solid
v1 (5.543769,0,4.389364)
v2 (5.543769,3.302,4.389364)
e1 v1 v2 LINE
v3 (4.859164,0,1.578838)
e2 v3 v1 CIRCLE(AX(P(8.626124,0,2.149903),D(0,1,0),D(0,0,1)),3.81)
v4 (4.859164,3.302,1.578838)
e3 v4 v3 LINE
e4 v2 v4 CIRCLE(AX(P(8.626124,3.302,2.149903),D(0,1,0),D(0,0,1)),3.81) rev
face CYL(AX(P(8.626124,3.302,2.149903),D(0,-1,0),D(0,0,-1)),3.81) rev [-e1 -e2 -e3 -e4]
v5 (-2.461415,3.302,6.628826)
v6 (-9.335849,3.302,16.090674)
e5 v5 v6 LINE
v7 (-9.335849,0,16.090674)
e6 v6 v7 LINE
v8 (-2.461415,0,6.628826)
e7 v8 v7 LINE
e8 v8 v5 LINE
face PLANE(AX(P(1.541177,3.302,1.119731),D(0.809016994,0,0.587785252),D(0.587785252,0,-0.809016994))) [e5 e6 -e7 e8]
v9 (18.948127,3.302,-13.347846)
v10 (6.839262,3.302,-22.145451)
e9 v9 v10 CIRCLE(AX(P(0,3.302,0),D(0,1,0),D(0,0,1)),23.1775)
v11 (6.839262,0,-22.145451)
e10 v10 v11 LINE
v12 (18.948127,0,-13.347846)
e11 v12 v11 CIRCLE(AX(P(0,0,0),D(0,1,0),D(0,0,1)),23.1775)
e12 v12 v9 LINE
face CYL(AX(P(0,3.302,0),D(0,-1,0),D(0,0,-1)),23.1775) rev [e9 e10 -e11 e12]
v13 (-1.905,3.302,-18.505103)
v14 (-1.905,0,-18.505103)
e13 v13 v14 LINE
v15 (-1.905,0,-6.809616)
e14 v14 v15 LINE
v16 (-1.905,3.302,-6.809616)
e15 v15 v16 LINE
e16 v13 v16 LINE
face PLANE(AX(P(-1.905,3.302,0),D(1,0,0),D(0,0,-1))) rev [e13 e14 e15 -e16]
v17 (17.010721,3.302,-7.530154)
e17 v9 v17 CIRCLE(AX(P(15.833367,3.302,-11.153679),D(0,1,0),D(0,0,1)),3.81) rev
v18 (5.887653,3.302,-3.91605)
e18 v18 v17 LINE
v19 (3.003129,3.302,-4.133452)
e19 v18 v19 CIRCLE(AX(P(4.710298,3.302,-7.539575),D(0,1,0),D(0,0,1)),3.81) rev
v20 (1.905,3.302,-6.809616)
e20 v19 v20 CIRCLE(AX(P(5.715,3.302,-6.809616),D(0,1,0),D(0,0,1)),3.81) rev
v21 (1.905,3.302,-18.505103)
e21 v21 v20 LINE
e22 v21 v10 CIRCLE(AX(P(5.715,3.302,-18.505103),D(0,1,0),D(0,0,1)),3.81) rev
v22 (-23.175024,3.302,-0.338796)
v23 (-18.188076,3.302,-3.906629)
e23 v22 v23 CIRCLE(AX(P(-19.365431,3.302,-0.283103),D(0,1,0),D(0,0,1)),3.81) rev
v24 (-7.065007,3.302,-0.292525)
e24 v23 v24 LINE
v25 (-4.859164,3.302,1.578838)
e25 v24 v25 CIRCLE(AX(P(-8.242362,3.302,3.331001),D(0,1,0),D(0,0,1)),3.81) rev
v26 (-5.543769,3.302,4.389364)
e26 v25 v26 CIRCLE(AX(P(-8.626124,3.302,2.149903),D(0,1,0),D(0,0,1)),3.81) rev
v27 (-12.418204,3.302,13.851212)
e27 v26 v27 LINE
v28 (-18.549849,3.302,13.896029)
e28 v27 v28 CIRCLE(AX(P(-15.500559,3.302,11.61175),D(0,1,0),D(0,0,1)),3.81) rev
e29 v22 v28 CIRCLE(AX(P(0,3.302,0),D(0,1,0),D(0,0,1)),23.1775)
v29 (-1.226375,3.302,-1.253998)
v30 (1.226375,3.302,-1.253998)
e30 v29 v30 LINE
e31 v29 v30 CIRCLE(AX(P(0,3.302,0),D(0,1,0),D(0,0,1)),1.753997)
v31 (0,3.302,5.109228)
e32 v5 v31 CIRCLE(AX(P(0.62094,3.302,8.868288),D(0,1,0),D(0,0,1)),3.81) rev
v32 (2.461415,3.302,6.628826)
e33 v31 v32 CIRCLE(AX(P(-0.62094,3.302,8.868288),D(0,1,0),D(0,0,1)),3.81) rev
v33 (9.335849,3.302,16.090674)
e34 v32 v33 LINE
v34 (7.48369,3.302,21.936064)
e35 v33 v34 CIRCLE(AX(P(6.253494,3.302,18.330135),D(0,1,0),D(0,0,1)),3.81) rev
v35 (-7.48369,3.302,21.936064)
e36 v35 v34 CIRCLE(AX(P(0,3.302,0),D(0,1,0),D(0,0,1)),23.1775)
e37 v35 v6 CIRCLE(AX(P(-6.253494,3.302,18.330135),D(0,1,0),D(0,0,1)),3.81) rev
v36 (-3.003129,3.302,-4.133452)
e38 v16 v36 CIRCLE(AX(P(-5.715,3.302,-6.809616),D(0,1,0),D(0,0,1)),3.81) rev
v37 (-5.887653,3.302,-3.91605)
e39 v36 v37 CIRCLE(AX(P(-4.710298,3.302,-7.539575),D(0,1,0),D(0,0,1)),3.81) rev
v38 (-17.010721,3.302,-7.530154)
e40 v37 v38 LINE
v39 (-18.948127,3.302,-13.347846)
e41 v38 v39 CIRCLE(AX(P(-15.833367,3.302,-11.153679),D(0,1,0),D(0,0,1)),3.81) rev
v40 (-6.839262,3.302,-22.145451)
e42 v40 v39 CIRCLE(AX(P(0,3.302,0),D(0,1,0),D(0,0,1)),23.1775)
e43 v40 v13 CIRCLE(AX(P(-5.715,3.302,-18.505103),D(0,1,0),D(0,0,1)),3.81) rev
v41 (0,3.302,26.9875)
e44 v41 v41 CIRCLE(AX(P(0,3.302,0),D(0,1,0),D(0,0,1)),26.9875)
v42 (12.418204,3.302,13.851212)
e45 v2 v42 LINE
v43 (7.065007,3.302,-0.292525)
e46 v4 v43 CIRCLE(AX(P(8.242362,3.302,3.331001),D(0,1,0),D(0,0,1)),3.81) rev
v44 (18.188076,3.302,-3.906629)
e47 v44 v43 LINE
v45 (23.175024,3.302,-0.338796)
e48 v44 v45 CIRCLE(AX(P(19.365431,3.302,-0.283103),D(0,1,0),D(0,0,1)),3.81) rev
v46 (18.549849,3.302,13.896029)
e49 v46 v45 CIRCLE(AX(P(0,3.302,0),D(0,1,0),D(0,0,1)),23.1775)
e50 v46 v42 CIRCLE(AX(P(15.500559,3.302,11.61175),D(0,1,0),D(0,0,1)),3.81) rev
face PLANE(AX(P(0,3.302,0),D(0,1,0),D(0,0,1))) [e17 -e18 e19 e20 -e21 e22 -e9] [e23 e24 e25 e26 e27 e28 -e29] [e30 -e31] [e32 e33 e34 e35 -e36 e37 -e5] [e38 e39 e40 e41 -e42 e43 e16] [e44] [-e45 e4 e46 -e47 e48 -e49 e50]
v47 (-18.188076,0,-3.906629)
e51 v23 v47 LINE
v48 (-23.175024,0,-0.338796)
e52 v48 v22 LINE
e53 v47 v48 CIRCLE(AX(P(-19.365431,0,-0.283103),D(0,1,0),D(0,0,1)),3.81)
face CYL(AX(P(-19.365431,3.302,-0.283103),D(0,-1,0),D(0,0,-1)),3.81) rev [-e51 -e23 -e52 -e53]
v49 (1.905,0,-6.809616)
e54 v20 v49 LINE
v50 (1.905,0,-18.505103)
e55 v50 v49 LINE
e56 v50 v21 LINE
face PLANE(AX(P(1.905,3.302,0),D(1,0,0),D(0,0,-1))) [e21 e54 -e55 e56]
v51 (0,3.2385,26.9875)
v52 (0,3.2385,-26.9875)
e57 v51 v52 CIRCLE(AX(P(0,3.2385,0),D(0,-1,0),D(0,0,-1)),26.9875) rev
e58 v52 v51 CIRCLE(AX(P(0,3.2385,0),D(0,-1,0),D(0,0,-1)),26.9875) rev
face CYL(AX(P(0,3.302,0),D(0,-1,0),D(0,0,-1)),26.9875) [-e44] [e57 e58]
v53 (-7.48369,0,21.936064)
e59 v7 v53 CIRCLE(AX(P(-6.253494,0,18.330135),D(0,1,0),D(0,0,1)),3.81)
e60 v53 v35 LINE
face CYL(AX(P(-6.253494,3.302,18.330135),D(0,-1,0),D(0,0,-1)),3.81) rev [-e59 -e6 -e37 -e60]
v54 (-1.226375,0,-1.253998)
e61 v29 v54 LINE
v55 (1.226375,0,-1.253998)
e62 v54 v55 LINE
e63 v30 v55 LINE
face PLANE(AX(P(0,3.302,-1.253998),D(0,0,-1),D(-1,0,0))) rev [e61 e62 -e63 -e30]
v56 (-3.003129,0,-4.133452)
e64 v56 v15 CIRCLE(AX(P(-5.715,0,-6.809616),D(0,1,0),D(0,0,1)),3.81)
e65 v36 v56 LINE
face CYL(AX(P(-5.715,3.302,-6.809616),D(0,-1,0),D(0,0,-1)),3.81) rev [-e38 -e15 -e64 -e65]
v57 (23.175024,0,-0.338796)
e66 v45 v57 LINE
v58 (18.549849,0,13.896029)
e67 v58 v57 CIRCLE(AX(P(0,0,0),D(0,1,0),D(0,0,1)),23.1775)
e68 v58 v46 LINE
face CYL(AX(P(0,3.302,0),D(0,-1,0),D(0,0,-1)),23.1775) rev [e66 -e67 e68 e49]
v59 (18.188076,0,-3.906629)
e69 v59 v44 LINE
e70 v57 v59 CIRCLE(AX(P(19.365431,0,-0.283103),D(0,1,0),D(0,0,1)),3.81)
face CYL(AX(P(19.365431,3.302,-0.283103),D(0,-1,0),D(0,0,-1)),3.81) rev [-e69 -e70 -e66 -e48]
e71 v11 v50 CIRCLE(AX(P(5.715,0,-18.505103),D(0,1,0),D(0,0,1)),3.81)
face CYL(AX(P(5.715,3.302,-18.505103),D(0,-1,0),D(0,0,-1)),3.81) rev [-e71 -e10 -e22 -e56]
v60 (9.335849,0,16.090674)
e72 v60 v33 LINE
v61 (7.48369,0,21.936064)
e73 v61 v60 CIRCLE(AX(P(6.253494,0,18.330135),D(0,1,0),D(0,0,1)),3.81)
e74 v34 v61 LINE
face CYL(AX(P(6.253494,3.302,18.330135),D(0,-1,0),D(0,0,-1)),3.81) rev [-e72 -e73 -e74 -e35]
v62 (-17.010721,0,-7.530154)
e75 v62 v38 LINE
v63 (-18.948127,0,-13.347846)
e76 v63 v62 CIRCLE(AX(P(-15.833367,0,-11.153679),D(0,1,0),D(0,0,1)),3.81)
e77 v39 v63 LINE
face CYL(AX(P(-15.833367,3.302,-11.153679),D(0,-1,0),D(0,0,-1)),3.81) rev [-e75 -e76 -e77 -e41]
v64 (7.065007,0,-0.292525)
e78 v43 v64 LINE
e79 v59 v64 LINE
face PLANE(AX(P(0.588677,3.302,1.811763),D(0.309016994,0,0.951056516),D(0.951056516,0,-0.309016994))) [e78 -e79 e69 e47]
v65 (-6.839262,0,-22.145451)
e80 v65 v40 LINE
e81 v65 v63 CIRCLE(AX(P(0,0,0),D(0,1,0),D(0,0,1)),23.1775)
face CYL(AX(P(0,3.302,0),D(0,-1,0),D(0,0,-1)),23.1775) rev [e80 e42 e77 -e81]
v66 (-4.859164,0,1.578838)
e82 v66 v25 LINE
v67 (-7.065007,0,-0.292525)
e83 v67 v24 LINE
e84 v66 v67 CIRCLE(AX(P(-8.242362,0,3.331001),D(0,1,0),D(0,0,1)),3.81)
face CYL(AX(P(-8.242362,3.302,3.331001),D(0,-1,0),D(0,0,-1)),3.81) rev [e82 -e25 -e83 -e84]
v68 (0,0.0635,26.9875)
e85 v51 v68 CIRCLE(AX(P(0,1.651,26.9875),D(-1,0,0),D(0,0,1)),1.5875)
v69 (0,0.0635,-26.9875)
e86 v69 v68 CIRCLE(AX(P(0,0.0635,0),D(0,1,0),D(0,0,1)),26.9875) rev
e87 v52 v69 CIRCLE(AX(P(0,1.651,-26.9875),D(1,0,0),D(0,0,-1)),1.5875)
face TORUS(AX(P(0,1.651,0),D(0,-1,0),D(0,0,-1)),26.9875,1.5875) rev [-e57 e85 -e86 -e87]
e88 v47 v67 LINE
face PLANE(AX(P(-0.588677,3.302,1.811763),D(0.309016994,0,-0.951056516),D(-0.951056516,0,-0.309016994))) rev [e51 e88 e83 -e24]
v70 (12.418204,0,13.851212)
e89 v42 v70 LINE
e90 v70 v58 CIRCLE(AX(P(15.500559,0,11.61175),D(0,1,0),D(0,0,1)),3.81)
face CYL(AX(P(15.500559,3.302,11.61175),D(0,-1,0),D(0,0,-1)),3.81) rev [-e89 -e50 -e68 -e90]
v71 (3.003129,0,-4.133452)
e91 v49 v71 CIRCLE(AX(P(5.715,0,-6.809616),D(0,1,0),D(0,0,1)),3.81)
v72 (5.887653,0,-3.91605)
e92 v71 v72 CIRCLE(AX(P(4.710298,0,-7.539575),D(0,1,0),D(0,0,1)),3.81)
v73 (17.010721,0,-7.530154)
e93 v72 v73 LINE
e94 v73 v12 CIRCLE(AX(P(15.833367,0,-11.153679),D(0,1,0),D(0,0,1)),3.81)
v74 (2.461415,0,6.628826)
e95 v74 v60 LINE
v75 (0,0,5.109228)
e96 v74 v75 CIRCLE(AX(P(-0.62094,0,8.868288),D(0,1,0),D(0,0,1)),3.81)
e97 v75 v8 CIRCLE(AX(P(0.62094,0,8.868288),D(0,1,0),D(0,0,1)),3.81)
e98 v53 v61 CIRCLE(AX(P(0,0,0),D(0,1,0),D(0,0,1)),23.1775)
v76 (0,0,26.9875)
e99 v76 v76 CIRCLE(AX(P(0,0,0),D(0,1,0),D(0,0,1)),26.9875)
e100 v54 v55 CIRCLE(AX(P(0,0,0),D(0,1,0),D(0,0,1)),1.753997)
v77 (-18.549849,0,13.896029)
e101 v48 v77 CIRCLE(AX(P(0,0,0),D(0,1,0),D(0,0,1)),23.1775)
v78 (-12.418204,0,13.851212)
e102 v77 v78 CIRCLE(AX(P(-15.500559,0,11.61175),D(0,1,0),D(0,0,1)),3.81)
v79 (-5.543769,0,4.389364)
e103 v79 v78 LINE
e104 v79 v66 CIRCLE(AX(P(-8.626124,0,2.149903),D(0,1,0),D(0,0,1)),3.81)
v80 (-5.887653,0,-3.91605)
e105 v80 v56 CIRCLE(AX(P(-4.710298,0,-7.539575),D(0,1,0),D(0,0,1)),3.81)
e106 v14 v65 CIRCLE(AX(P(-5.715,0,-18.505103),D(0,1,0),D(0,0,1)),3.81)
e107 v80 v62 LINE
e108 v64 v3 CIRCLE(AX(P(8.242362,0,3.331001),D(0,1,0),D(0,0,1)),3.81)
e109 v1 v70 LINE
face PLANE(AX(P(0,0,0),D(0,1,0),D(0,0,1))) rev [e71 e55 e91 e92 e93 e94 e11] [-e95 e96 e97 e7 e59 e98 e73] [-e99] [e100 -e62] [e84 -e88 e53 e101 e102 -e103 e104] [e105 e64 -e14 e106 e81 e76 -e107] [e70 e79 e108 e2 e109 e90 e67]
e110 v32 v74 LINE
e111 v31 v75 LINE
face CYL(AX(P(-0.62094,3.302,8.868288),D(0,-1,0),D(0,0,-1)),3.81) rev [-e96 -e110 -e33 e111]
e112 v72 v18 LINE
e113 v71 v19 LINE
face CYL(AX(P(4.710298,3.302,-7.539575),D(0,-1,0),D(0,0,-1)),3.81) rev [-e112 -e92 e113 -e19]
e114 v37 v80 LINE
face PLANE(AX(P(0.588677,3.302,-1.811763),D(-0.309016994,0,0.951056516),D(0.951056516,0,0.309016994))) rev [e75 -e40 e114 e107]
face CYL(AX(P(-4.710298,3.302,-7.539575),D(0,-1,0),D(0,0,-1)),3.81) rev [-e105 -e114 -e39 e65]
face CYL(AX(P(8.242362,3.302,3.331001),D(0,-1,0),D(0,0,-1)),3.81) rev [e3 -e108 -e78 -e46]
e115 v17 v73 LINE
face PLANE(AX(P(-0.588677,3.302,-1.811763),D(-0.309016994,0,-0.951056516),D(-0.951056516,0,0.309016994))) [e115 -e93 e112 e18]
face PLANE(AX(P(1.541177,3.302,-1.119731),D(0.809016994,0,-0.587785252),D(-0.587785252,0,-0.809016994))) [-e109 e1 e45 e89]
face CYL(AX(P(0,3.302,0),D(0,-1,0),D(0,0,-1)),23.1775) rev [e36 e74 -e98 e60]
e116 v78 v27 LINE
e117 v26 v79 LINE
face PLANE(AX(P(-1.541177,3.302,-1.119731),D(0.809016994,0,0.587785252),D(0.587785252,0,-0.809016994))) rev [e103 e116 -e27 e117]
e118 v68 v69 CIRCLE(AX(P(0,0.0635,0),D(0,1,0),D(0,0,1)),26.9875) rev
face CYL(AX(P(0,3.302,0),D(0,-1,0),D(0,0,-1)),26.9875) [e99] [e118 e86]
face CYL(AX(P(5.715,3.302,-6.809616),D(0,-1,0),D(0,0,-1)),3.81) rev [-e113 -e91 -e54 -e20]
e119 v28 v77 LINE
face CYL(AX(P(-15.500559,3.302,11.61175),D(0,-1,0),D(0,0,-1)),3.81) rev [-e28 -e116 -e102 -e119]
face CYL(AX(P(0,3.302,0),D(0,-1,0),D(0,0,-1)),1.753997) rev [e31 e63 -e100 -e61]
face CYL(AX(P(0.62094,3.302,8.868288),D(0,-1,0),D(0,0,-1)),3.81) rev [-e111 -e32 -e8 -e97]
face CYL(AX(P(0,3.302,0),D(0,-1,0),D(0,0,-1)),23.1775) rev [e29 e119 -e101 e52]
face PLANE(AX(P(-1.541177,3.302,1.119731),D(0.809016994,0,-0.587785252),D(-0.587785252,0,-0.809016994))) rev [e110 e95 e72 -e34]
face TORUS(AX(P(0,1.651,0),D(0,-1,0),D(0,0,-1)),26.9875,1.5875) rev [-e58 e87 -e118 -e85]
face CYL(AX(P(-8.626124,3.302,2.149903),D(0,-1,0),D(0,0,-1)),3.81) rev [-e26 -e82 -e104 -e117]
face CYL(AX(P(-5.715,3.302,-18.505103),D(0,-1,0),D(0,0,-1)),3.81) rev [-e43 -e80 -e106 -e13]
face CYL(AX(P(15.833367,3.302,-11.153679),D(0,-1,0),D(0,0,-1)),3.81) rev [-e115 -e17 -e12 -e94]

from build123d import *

# Parameters (mm, degrees)
SKETCH1_R           = 26.9875
BOSS_EXTRUDE1_DEPTH = 3.302
FILLET1_R           = 3.81
SKETCH2_R           = 1.5875


with BuildPart() as part:
    # Sketch1 → Boss-Extrude1 (new body)
    with BuildSketch(Plane(origin=(0, 0, 0), x_dir=(1, 0, 0), z_dir=(0, 1, 0))):
        with Locations(Location((0, 0, 0), (0, 0, 90))):
            Circle(SKETCH1_R)
        with BuildLine():
            Line((-1.905, 23.099079662), (-1.905, 4.709286039))
            ThreePointArc((-1.905, 4.709286039), (-2.985949082, 4.109806331), (-3.8901198, 3.267012081))
            Line((-3.8901198, 3.267012081), (-21.379852859, 8.949770834))
            ThreePointArc((-21.379852859, 8.949770834), (-13.623392685, 18.750991387), (-1.905, 23.099079662))
        make_face(mode=Mode.SUBTRACT)
        with BuildLine():
            Line((1.905, 23.099079662), (1.905, 4.709286039))
            ThreePointArc((1.905, 4.709286039), (2.985949082, 4.109806331), (3.8901198, 3.267012081))
            Line((3.8901198, 3.267012081), (21.379852859, 8.949770834))
            ThreePointArc((21.379852859, 8.949770834), (13.623392685, 18.750991387), (1.905, 23.099079662))
        make_face(mode=Mode.SUBTRACT)
        with BuildLine():
            Line((-22.557207608, 5.326245507), (-5.067474549, -0.356513246))
            ThreePointArc((-5.067474549, -0.356513246), (-4.831367103, -1.569806331), (-4.309226257, -2.690161532))
            Line((-4.309226257, -2.690161532), (-15.118475741, -17.567817096))
            ThreePointArc((-15.118475741, -17.567817096), (-22.043112406, -7.162241387), (-22.557207608, 5.326245507))
        make_face(mode=Mode.SUBTRACT)
        with BuildLine():
            Line((-1.226871508, -4.929623343), (-12.036120993, -19.807278907))
            ThreePointArc((-12.036120993, -19.807278907), (0, -23.1775), (12.036120993, -19.807278907))
            Line((12.036120993, -19.807278907), (1.226871508, -4.929623343))
            ThreePointArc((1.226871508, -4.929623343), (0, -5.08), (-1.226871508, -4.929623343))
        make_face(mode=Mode.SUBTRACT)
        with BuildLine():
            Line((22.557207608, 5.326245507), (5.067474549, -0.356513246))
            ThreePointArc((5.067474549, -0.356513246), (4.831367103, -1.569806331), (4.309226257, -2.690161532))
            Line((4.309226257, -2.690161532), (15.118475741, -17.567817096))
            ThreePointArc((15.118475741, -17.567817096), (22.043112406, -7.162241387), (22.557207608, 5.326245507))
        make_face(mode=Mode.SUBTRACT)
        with BuildLine():
            Line((-1.226374532, 1.253998), (1.226374532, 1.253998))
            ThreePointArc((1.226374532, 1.253998), (0, -1.753997), (-1.226374532, 1.253998))
        make_face(mode=Mode.SUBTRACT)
    extrude(amount=BOSS_EXTRUDE1_DEPTH)

    # Fillet1
    # the kernel refuses this fillet: 3.81 mm, written as the material it adds along each edge
    with BuildSketch(Plane(origin=(-22.557207608, 0, -5.326245507), x_dir=(0.9510565162951546, 0, 0.3090169943749439), z_dir=(0, 1, 0)), Plane(origin=(-1.905, 0, -23.099079662), x_dir=(0, 0, 1), z_dir=(0, 1, 0))) as fillet1_piece_1:
        with BuildLine():
            CenterArc((4.593976819, -3.81), FILLET1_R, 90, 107.162452548)
            ThreePointArc((0.953628718, -4.934262295), (0.342682242, -2.493054423), (0, 0))
            Line((0, 0), (4.593976819, 0))
        make_face()
    extrude(amount=3.302)
    with BuildSketch(Plane(origin=(-5.067474549, 0, 0.356513246), x_dir=(-0.9510565162951546, 0, -0.3090169943749442), z_dir=(0, 1, 0)), Plane(origin=(-1.226871508, 0, 4.929623343), x_dir=(-0.5877852522924791, 0, 0.8090169943749429), z_dir=(0, 1, 0)), Plane(origin=(4.309226257, 0, 2.690161532), x_dir=(0.5877852522924685, 0, 0.8090169943749509), z_dir=(0, 1, 0)), Plane(origin=(-1.905, 0, -4.709286039), x_dir=(0, 0, -1), z_dir=(0, 1, 0))) as fillet1_piece_2:
        with BuildLine():
            CenterArc((2.100330323, 3.81), FILLET1_R, 220.005200885, 49.994799115)
            ThreePointArc((-0.818076689, 1.360714286), (-0.355550163, 0.712514837), (0, 0))
            Line((0, 0), (2.100330323, 0))
        make_face()
    extrude(amount=3.302)
    with BuildSketch(Plane(origin=(-4.309226257, 0, 2.690161532), x_dir=(-0.3904940341583853, 0, -0.9206054579931132), z_dir=(0, 1, 0)), Plane(origin=(1.226871508, 0, 4.929623343), x_dir=(-0.9962171125182067, 0, 0.08689916412651309), z_dir=(0, 1, 0)), Plane(origin=(5.067474549, 0, 0.356513246), x_dir=(-0.22520200155214, 0, 0.9743120950172537), z_dir=(0, 1, 0)), Plane(origin=(1.905, 0, -4.709286039), x_dir=(0.8570346212244796, 0, 0.5152588262442601), z_dir=(0, 1, 0)), Plane(origin=(-3.8901198, 0, -3.267012081), x_dir=(0.7548785270042563, 0, -0.6558646273949256), z_dir=(0, 1, 0))) as fillet1_piece_3:
        with BuildLine():
            CenterArc((2.18308817, 3.763191931), FILLET1_R, 211.014756861, 49.994799115)
            Line((-1.082213737, 1.800055803), (0, 0))
            ThreePointArc((0, 0), (0.793850244, 0.062410759), (1.587700487, 0))
        make_face()
    extrude(amount=3.302)
    with BuildSketch(Plane(origin=(-15.118475741, 0, 17.567817096), x_dir=(0.5877852522924796, 0, -0.8090169943749426), z_dir=(0, 1, 0)), Plane(origin=(-21.379852859, 0, -8.949770834), x_dir=(0.9510565162951546, 0, 0.3090169943749444), z_dir=(0, 1, 0)), Plane(origin=(1.905, 0, -23.099079662), x_dir=(0, 0, 1), z_dir=(0, 1, 0))) as fillet1_piece_4:
        with BuildLine():
            CenterArc((4.593976819, 3.81), FILLET1_R, 162.837547452, 107.162452548)
            ThreePointArc((0.953628718, 4.934262295), (0.342682242, 2.493054423), (0, 0))
            Line((0, 0), (4.593976819, 0))
        make_face()
    extrude(amount=3.302)
    with BuildSketch(Plane(origin=(12.036120993, 0, 19.807278907), x_dir=(-0.9058536844822791, 0, 0.42359072500454903), z_dir=(0, 1, 0)), Plane(origin=(22.557207608, 0, -5.326245507), x_dir=(0.1229345363355818, 0, 0.9924147821228559), z_dir=(0, 1, 0))) as fillet1_piece_5:
        with BuildLine():
            CenterArc((4.612509297, -3.78754287), FILLET1_R, 83.776053996, 107.162452548)
            Line((0.871731639, -4.510510721), (0, 0))
            ThreePointArc((0, 0), (2.512784916, 0.136614205), (5.025569831, 0))
        make_face()
    extrude(amount=3.302)
    with BuildSketch(Plane(origin=(-12.036120993, 0, 19.807278907), x_dir=(0.9058536844822742, 0, 0.42359072500455974), z_dir=(0, 1, 0)), Plane(origin=(15.118475741, 0, 17.567817096), x_dir=(0.6827829021799576, 0, -0.7306213167508284), z_dir=(0, 1, 0)), Plane(origin=(21.379852859, 0, -8.949770834), x_dir=(-0.4838706439977688, 0, -0.8751395316617714), z_dir=(0, 1, 0))) as fillet1_piece_6:
        with BuildLine():
            CenterArc((4.612509297, 3.78754287), FILLET1_R, 169.061493455, 107.162452548)
            Line((0.871731639, 4.510510721), (0, 0))
            ThreePointArc((0, 0), (2.512784916, -0.136614205), (5.025569831, 0))
        make_face()
    extrude(amount=3.302)
    with BuildSketch(Plane(origin=(3.8901198, 0, -3.267012081), x_dir=(-0.7548785270042564, 0, -0.6558646273949251), z_dir=(0, 1, 0))) as fillet1_piece_7:
        with BuildLine():
            CenterArc((2.18308817, -3.763191931), FILLET1_R, 98.990444024, 49.994799115)
            Line((-1.082213737, -1.800055803), (0, 0))
            ThreePointArc((0, 0), (0.793850244, -0.062410759), (1.587700487, 0))
        make_face()
    extrude(amount=3.302)

    # Cut-Sweep1: sweep along a curve in space
    with BuildLine() as cut_sweep1_path:
        ThreePointArc((0, 0, 26.9875), (19.083044257, 0, 19.083044257), (26.9875, 0, 0))
        ThreePointArc((26.9875, 0, 0), (19.083044257, 0, -19.083044257), (0, 0, -26.9875))
        ThreePointArc((0, 0, -26.9875), (-19.083044257, 0, -19.083044257), (-26.9875, 0, 0))
        ThreePointArc((-26.9875, 0, 0), (-19.083044257, 0, 19.083044257), (0, 0, 26.9875))
    # Sketch2 → Cut-Sweep1 (sweep, cut)
    with BuildSketch(Plane(origin=(0, 0, 0), x_dir=(0, 0, -1), z_dir=(1, 0, 0))):
        with Locations((26.9875, 1.651)):
            Circle(SKETCH2_R)
    sweep(path=cut_sweep1_path.line, mode=Mode.SUBTRACT)


solid = part.part
